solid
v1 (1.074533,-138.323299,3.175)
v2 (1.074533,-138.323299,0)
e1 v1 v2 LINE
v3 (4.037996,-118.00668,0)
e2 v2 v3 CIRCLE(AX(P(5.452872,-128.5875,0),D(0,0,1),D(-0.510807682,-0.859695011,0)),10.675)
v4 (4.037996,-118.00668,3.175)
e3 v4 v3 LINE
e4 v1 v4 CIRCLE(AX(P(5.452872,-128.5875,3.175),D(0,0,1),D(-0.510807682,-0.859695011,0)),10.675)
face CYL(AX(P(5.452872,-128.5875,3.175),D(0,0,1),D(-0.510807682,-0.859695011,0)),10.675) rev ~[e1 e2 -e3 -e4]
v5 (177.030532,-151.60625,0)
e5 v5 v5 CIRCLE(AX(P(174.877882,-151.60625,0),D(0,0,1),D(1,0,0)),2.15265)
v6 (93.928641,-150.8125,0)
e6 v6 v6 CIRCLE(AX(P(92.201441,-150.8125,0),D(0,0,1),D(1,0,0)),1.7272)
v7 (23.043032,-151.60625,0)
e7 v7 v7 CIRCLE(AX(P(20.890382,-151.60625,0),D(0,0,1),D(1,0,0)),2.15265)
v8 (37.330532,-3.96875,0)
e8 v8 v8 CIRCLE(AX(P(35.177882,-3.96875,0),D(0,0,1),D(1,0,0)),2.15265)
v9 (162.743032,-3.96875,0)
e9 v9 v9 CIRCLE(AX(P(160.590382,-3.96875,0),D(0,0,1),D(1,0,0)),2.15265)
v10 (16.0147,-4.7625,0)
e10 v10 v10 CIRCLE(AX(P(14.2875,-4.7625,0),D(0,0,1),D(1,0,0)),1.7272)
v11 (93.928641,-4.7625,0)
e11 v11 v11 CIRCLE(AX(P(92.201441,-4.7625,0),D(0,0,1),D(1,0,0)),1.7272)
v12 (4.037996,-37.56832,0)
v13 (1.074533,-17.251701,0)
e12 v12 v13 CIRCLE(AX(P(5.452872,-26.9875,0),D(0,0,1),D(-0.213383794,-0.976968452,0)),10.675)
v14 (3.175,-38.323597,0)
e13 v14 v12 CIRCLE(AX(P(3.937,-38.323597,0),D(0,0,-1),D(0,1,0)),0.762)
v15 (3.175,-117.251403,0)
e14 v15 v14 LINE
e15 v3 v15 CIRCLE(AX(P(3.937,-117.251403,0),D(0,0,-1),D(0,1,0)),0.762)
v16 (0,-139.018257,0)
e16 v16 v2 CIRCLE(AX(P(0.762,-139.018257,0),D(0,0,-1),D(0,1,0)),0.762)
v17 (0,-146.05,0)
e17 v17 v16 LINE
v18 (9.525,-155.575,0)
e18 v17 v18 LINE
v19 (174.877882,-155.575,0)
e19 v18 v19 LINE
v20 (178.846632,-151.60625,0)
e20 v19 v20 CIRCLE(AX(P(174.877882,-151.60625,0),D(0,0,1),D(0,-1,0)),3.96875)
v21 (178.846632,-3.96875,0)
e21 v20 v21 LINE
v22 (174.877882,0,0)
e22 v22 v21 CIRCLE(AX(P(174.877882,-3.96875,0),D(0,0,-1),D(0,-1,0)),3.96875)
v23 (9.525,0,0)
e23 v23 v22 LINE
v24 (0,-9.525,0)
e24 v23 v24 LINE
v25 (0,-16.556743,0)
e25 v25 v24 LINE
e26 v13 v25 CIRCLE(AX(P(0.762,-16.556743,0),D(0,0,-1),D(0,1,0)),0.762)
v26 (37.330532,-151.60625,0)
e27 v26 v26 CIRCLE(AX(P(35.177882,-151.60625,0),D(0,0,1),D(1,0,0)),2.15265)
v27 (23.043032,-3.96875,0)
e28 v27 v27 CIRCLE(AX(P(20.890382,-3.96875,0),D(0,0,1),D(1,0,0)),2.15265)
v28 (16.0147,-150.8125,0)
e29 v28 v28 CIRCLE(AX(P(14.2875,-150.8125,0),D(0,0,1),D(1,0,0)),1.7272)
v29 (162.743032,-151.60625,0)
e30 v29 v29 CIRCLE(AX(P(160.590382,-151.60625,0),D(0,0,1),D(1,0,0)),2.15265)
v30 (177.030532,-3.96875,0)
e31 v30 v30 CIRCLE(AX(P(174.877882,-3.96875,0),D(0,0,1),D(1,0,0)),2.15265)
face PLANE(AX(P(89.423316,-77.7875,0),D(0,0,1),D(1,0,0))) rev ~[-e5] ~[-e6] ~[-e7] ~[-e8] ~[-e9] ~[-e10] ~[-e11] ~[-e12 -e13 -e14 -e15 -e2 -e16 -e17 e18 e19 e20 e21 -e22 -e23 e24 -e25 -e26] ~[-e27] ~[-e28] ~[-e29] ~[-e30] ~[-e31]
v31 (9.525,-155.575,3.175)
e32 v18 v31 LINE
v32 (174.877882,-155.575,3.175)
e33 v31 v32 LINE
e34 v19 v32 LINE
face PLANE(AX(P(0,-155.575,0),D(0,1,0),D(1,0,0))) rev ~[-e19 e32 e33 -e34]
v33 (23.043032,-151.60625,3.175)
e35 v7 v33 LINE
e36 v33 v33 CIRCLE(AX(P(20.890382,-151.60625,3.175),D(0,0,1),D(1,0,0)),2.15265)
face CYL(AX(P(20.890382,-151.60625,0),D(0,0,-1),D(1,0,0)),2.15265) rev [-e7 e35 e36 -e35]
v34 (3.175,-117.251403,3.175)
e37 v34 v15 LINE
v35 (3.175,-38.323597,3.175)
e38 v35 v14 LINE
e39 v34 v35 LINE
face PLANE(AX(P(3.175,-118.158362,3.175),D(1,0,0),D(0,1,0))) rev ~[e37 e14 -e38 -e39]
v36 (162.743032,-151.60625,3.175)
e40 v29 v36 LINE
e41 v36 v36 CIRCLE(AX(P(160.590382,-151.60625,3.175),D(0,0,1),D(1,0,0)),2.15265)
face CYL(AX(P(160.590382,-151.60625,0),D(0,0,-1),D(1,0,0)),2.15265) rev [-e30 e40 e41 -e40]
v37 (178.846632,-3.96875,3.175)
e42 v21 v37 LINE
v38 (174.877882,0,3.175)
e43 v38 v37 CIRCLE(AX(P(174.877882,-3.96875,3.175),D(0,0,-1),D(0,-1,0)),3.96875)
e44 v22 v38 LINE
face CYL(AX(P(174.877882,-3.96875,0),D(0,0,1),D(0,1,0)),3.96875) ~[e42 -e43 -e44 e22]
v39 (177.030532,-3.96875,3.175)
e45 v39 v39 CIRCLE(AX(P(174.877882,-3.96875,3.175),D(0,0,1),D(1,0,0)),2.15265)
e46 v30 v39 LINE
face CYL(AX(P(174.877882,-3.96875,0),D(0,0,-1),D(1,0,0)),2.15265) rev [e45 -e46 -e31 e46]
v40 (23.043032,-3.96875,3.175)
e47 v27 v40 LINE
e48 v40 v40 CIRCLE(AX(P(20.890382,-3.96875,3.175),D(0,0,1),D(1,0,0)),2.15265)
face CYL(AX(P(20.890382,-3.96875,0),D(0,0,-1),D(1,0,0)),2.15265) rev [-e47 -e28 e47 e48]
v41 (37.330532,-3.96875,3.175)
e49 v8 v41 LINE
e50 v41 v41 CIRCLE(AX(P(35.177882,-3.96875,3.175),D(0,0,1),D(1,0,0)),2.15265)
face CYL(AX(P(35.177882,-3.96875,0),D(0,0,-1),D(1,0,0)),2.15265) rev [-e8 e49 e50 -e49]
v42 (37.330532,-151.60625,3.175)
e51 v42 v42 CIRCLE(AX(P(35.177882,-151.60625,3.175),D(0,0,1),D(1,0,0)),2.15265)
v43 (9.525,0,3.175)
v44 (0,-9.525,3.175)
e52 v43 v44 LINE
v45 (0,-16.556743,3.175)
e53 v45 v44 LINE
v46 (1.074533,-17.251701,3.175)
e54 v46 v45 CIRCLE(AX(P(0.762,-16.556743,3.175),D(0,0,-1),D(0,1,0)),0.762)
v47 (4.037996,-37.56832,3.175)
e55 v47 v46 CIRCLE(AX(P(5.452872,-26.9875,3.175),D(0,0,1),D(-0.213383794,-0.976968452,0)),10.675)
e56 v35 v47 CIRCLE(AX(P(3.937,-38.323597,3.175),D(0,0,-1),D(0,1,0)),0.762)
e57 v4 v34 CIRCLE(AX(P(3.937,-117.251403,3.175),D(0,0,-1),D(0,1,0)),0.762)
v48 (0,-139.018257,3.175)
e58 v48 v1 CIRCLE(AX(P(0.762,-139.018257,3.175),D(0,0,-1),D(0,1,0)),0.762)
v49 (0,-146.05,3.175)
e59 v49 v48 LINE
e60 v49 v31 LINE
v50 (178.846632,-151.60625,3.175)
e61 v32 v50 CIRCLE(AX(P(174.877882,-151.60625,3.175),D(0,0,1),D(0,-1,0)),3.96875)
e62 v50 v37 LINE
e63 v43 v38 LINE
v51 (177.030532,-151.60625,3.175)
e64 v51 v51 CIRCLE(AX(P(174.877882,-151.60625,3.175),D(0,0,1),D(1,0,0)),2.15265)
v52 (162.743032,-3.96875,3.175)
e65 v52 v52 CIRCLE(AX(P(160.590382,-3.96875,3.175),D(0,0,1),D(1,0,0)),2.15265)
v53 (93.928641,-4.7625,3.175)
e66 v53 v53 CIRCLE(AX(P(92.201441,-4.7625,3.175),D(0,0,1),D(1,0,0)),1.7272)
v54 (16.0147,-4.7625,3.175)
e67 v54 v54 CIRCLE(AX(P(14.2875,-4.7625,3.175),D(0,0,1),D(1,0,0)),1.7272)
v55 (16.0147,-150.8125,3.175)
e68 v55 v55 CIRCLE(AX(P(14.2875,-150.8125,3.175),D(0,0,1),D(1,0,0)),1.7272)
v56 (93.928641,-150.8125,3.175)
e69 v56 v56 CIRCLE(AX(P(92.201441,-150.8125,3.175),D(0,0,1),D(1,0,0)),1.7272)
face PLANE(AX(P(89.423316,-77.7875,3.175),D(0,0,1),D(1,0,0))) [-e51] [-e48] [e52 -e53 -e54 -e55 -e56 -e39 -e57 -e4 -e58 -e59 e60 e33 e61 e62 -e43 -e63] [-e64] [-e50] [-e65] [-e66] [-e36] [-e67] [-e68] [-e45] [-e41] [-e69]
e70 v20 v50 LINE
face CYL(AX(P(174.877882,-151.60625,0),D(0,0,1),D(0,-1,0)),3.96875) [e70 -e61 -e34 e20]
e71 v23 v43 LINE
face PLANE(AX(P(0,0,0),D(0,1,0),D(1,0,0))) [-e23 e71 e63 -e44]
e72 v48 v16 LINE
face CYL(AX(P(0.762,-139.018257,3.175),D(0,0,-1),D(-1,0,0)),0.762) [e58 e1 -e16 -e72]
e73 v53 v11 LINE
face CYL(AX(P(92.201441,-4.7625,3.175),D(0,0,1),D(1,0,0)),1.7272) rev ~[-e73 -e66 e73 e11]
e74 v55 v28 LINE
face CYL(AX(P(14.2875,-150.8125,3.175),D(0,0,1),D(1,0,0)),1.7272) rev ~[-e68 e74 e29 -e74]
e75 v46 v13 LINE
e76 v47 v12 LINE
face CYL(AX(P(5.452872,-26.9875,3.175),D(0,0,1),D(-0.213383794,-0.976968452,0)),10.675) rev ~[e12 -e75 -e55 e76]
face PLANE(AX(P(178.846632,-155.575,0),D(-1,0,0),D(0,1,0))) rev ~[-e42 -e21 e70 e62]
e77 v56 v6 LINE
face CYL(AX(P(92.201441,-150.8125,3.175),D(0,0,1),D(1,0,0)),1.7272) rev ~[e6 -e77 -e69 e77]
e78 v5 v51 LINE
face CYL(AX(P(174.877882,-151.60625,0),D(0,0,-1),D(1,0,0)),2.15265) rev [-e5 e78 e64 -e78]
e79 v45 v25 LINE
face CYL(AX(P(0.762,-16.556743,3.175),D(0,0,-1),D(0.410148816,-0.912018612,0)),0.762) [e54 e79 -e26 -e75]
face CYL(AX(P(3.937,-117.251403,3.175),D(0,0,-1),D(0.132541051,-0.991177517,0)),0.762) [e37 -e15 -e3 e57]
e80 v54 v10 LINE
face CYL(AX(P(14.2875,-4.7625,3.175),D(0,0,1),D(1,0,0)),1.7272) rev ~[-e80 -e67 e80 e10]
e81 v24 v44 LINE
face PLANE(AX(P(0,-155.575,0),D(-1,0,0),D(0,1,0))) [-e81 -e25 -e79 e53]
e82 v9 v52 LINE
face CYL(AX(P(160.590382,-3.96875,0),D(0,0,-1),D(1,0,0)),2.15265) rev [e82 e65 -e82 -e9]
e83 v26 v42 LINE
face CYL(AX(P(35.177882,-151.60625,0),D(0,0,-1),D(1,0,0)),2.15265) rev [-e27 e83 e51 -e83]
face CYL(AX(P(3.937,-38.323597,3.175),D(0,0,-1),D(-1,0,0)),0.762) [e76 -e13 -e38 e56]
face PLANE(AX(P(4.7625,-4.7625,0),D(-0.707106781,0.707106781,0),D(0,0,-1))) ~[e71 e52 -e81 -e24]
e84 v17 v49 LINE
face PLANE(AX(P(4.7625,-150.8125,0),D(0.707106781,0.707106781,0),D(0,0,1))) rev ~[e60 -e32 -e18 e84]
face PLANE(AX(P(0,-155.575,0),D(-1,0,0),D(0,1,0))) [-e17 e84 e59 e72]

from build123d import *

# Parameters (mm, degrees)
F0_W     = 178.8466324
F0_H     = 155.575
F0_R     = 2.15265
F1_DEPTH = 3.175
F2_R     = 3.96875
F4_DEPTH = 3.175
F5_R     = 0.762
F6_SIZE  = 9.525
F7_R     = 1.7272
F8_DEPTH = 3.175


with BuildPart() as f1:
    # F0 (on Top) → F1 (new body)
    with BuildSketch(Plane.XY):
        with Locations((89.4233162, -77.7875)):
            Rectangle(F0_W, F0_H)
        with Locations((20.8903824, -151.60625)):
            Circle(F0_R, mode=Mode.SUBTRACT)
        with Locations((35.1778824, -151.60625)):
            Circle(F0_R, mode=Mode.SUBTRACT)
        with Locations((160.5903824, -151.60625)):
            Circle(F0_R, mode=Mode.SUBTRACT)
        with Locations((174.8778824, -151.60625)):
            Circle(F0_R, mode=Mode.SUBTRACT)
        with Locations((20.8903824, -3.96875)):
            Circle(F0_R, mode=Mode.SUBTRACT)
        with Locations((35.1778824, -3.96875)):
            Circle(F0_R, mode=Mode.SUBTRACT)
        with Locations((160.5903824, -3.96875)):
            Circle(F0_R, mode=Mode.SUBTRACT)
        with Locations((174.8778824, -3.96875)):
            Circle(F0_R, mode=Mode.SUBTRACT)
    extrude(amount=F1_DEPTH)

    # F2
    f2_edges = [f1.edges().sort_by_distance(p)[0] for p in [
        (178.846632, 0, 1.5875),
        (178.846632, -155.575, 1.5875),
    ]]
    fillet(f2_edges, radius=F2_R)

    # F3 (on face) → F4 (cut, through all)
    with BuildSketch(Plane.XY.offset(3.175)):
        with BuildLine():
            Line((0, -17.8102557702), (0, -137.7647442298))
            ThreePointArc((0, -137.7647442298), (15.9905975048, -130.293948325), (3.175, -118.1583617876))
            Line((3.175, -118.1583617876), (3.175, -37.4166382124))
            ThreePointArc((3.175, -37.4166382124), (15.9905975048, -25.281051675), (0, -17.8102557702))
        make_face()
    extrude(amount=-F4_DEPTH, mode=Mode.SUBTRACT)

    # F5
    f5_edges = [f1.edges().sort_by_distance(p)[0] for p in [
        (0, -17.810256, 1.5875),
        (0, -137.764744, 1.5875),
        (3.175, -37.416638, 1.5875),
        (3.175, -118.158362, 1.5875),
    ]]
    fillet(f5_edges, radius=F5_R)

    # F6
    f6_edges = [f1.edges().sort_by_distance(p)[0] for p in [
        (0, 0, 1.5875),
        (0, -155.575, 1.5875),
    ]]
    chamfer(f6_edges, length=F6_SIZE)

    # F7 (on face) → F8 (cut, through all)
    with BuildSketch(Plane.XY.offset(3.175)):
        with Locations((92.2014412, -4.7625)):
            Circle(F7_R)
        with Locations((14.2875, -4.7625)):
            Circle(F7_R)
        with Locations((14.2875, -150.8125)):
            Circle(F7_R)
        with Locations((92.2014412, -150.8125)):
            Circle(F7_R)
    extrude(amount=-F8_DEPTH, mode=Mode.SUBTRACT)


solid = f1.part
